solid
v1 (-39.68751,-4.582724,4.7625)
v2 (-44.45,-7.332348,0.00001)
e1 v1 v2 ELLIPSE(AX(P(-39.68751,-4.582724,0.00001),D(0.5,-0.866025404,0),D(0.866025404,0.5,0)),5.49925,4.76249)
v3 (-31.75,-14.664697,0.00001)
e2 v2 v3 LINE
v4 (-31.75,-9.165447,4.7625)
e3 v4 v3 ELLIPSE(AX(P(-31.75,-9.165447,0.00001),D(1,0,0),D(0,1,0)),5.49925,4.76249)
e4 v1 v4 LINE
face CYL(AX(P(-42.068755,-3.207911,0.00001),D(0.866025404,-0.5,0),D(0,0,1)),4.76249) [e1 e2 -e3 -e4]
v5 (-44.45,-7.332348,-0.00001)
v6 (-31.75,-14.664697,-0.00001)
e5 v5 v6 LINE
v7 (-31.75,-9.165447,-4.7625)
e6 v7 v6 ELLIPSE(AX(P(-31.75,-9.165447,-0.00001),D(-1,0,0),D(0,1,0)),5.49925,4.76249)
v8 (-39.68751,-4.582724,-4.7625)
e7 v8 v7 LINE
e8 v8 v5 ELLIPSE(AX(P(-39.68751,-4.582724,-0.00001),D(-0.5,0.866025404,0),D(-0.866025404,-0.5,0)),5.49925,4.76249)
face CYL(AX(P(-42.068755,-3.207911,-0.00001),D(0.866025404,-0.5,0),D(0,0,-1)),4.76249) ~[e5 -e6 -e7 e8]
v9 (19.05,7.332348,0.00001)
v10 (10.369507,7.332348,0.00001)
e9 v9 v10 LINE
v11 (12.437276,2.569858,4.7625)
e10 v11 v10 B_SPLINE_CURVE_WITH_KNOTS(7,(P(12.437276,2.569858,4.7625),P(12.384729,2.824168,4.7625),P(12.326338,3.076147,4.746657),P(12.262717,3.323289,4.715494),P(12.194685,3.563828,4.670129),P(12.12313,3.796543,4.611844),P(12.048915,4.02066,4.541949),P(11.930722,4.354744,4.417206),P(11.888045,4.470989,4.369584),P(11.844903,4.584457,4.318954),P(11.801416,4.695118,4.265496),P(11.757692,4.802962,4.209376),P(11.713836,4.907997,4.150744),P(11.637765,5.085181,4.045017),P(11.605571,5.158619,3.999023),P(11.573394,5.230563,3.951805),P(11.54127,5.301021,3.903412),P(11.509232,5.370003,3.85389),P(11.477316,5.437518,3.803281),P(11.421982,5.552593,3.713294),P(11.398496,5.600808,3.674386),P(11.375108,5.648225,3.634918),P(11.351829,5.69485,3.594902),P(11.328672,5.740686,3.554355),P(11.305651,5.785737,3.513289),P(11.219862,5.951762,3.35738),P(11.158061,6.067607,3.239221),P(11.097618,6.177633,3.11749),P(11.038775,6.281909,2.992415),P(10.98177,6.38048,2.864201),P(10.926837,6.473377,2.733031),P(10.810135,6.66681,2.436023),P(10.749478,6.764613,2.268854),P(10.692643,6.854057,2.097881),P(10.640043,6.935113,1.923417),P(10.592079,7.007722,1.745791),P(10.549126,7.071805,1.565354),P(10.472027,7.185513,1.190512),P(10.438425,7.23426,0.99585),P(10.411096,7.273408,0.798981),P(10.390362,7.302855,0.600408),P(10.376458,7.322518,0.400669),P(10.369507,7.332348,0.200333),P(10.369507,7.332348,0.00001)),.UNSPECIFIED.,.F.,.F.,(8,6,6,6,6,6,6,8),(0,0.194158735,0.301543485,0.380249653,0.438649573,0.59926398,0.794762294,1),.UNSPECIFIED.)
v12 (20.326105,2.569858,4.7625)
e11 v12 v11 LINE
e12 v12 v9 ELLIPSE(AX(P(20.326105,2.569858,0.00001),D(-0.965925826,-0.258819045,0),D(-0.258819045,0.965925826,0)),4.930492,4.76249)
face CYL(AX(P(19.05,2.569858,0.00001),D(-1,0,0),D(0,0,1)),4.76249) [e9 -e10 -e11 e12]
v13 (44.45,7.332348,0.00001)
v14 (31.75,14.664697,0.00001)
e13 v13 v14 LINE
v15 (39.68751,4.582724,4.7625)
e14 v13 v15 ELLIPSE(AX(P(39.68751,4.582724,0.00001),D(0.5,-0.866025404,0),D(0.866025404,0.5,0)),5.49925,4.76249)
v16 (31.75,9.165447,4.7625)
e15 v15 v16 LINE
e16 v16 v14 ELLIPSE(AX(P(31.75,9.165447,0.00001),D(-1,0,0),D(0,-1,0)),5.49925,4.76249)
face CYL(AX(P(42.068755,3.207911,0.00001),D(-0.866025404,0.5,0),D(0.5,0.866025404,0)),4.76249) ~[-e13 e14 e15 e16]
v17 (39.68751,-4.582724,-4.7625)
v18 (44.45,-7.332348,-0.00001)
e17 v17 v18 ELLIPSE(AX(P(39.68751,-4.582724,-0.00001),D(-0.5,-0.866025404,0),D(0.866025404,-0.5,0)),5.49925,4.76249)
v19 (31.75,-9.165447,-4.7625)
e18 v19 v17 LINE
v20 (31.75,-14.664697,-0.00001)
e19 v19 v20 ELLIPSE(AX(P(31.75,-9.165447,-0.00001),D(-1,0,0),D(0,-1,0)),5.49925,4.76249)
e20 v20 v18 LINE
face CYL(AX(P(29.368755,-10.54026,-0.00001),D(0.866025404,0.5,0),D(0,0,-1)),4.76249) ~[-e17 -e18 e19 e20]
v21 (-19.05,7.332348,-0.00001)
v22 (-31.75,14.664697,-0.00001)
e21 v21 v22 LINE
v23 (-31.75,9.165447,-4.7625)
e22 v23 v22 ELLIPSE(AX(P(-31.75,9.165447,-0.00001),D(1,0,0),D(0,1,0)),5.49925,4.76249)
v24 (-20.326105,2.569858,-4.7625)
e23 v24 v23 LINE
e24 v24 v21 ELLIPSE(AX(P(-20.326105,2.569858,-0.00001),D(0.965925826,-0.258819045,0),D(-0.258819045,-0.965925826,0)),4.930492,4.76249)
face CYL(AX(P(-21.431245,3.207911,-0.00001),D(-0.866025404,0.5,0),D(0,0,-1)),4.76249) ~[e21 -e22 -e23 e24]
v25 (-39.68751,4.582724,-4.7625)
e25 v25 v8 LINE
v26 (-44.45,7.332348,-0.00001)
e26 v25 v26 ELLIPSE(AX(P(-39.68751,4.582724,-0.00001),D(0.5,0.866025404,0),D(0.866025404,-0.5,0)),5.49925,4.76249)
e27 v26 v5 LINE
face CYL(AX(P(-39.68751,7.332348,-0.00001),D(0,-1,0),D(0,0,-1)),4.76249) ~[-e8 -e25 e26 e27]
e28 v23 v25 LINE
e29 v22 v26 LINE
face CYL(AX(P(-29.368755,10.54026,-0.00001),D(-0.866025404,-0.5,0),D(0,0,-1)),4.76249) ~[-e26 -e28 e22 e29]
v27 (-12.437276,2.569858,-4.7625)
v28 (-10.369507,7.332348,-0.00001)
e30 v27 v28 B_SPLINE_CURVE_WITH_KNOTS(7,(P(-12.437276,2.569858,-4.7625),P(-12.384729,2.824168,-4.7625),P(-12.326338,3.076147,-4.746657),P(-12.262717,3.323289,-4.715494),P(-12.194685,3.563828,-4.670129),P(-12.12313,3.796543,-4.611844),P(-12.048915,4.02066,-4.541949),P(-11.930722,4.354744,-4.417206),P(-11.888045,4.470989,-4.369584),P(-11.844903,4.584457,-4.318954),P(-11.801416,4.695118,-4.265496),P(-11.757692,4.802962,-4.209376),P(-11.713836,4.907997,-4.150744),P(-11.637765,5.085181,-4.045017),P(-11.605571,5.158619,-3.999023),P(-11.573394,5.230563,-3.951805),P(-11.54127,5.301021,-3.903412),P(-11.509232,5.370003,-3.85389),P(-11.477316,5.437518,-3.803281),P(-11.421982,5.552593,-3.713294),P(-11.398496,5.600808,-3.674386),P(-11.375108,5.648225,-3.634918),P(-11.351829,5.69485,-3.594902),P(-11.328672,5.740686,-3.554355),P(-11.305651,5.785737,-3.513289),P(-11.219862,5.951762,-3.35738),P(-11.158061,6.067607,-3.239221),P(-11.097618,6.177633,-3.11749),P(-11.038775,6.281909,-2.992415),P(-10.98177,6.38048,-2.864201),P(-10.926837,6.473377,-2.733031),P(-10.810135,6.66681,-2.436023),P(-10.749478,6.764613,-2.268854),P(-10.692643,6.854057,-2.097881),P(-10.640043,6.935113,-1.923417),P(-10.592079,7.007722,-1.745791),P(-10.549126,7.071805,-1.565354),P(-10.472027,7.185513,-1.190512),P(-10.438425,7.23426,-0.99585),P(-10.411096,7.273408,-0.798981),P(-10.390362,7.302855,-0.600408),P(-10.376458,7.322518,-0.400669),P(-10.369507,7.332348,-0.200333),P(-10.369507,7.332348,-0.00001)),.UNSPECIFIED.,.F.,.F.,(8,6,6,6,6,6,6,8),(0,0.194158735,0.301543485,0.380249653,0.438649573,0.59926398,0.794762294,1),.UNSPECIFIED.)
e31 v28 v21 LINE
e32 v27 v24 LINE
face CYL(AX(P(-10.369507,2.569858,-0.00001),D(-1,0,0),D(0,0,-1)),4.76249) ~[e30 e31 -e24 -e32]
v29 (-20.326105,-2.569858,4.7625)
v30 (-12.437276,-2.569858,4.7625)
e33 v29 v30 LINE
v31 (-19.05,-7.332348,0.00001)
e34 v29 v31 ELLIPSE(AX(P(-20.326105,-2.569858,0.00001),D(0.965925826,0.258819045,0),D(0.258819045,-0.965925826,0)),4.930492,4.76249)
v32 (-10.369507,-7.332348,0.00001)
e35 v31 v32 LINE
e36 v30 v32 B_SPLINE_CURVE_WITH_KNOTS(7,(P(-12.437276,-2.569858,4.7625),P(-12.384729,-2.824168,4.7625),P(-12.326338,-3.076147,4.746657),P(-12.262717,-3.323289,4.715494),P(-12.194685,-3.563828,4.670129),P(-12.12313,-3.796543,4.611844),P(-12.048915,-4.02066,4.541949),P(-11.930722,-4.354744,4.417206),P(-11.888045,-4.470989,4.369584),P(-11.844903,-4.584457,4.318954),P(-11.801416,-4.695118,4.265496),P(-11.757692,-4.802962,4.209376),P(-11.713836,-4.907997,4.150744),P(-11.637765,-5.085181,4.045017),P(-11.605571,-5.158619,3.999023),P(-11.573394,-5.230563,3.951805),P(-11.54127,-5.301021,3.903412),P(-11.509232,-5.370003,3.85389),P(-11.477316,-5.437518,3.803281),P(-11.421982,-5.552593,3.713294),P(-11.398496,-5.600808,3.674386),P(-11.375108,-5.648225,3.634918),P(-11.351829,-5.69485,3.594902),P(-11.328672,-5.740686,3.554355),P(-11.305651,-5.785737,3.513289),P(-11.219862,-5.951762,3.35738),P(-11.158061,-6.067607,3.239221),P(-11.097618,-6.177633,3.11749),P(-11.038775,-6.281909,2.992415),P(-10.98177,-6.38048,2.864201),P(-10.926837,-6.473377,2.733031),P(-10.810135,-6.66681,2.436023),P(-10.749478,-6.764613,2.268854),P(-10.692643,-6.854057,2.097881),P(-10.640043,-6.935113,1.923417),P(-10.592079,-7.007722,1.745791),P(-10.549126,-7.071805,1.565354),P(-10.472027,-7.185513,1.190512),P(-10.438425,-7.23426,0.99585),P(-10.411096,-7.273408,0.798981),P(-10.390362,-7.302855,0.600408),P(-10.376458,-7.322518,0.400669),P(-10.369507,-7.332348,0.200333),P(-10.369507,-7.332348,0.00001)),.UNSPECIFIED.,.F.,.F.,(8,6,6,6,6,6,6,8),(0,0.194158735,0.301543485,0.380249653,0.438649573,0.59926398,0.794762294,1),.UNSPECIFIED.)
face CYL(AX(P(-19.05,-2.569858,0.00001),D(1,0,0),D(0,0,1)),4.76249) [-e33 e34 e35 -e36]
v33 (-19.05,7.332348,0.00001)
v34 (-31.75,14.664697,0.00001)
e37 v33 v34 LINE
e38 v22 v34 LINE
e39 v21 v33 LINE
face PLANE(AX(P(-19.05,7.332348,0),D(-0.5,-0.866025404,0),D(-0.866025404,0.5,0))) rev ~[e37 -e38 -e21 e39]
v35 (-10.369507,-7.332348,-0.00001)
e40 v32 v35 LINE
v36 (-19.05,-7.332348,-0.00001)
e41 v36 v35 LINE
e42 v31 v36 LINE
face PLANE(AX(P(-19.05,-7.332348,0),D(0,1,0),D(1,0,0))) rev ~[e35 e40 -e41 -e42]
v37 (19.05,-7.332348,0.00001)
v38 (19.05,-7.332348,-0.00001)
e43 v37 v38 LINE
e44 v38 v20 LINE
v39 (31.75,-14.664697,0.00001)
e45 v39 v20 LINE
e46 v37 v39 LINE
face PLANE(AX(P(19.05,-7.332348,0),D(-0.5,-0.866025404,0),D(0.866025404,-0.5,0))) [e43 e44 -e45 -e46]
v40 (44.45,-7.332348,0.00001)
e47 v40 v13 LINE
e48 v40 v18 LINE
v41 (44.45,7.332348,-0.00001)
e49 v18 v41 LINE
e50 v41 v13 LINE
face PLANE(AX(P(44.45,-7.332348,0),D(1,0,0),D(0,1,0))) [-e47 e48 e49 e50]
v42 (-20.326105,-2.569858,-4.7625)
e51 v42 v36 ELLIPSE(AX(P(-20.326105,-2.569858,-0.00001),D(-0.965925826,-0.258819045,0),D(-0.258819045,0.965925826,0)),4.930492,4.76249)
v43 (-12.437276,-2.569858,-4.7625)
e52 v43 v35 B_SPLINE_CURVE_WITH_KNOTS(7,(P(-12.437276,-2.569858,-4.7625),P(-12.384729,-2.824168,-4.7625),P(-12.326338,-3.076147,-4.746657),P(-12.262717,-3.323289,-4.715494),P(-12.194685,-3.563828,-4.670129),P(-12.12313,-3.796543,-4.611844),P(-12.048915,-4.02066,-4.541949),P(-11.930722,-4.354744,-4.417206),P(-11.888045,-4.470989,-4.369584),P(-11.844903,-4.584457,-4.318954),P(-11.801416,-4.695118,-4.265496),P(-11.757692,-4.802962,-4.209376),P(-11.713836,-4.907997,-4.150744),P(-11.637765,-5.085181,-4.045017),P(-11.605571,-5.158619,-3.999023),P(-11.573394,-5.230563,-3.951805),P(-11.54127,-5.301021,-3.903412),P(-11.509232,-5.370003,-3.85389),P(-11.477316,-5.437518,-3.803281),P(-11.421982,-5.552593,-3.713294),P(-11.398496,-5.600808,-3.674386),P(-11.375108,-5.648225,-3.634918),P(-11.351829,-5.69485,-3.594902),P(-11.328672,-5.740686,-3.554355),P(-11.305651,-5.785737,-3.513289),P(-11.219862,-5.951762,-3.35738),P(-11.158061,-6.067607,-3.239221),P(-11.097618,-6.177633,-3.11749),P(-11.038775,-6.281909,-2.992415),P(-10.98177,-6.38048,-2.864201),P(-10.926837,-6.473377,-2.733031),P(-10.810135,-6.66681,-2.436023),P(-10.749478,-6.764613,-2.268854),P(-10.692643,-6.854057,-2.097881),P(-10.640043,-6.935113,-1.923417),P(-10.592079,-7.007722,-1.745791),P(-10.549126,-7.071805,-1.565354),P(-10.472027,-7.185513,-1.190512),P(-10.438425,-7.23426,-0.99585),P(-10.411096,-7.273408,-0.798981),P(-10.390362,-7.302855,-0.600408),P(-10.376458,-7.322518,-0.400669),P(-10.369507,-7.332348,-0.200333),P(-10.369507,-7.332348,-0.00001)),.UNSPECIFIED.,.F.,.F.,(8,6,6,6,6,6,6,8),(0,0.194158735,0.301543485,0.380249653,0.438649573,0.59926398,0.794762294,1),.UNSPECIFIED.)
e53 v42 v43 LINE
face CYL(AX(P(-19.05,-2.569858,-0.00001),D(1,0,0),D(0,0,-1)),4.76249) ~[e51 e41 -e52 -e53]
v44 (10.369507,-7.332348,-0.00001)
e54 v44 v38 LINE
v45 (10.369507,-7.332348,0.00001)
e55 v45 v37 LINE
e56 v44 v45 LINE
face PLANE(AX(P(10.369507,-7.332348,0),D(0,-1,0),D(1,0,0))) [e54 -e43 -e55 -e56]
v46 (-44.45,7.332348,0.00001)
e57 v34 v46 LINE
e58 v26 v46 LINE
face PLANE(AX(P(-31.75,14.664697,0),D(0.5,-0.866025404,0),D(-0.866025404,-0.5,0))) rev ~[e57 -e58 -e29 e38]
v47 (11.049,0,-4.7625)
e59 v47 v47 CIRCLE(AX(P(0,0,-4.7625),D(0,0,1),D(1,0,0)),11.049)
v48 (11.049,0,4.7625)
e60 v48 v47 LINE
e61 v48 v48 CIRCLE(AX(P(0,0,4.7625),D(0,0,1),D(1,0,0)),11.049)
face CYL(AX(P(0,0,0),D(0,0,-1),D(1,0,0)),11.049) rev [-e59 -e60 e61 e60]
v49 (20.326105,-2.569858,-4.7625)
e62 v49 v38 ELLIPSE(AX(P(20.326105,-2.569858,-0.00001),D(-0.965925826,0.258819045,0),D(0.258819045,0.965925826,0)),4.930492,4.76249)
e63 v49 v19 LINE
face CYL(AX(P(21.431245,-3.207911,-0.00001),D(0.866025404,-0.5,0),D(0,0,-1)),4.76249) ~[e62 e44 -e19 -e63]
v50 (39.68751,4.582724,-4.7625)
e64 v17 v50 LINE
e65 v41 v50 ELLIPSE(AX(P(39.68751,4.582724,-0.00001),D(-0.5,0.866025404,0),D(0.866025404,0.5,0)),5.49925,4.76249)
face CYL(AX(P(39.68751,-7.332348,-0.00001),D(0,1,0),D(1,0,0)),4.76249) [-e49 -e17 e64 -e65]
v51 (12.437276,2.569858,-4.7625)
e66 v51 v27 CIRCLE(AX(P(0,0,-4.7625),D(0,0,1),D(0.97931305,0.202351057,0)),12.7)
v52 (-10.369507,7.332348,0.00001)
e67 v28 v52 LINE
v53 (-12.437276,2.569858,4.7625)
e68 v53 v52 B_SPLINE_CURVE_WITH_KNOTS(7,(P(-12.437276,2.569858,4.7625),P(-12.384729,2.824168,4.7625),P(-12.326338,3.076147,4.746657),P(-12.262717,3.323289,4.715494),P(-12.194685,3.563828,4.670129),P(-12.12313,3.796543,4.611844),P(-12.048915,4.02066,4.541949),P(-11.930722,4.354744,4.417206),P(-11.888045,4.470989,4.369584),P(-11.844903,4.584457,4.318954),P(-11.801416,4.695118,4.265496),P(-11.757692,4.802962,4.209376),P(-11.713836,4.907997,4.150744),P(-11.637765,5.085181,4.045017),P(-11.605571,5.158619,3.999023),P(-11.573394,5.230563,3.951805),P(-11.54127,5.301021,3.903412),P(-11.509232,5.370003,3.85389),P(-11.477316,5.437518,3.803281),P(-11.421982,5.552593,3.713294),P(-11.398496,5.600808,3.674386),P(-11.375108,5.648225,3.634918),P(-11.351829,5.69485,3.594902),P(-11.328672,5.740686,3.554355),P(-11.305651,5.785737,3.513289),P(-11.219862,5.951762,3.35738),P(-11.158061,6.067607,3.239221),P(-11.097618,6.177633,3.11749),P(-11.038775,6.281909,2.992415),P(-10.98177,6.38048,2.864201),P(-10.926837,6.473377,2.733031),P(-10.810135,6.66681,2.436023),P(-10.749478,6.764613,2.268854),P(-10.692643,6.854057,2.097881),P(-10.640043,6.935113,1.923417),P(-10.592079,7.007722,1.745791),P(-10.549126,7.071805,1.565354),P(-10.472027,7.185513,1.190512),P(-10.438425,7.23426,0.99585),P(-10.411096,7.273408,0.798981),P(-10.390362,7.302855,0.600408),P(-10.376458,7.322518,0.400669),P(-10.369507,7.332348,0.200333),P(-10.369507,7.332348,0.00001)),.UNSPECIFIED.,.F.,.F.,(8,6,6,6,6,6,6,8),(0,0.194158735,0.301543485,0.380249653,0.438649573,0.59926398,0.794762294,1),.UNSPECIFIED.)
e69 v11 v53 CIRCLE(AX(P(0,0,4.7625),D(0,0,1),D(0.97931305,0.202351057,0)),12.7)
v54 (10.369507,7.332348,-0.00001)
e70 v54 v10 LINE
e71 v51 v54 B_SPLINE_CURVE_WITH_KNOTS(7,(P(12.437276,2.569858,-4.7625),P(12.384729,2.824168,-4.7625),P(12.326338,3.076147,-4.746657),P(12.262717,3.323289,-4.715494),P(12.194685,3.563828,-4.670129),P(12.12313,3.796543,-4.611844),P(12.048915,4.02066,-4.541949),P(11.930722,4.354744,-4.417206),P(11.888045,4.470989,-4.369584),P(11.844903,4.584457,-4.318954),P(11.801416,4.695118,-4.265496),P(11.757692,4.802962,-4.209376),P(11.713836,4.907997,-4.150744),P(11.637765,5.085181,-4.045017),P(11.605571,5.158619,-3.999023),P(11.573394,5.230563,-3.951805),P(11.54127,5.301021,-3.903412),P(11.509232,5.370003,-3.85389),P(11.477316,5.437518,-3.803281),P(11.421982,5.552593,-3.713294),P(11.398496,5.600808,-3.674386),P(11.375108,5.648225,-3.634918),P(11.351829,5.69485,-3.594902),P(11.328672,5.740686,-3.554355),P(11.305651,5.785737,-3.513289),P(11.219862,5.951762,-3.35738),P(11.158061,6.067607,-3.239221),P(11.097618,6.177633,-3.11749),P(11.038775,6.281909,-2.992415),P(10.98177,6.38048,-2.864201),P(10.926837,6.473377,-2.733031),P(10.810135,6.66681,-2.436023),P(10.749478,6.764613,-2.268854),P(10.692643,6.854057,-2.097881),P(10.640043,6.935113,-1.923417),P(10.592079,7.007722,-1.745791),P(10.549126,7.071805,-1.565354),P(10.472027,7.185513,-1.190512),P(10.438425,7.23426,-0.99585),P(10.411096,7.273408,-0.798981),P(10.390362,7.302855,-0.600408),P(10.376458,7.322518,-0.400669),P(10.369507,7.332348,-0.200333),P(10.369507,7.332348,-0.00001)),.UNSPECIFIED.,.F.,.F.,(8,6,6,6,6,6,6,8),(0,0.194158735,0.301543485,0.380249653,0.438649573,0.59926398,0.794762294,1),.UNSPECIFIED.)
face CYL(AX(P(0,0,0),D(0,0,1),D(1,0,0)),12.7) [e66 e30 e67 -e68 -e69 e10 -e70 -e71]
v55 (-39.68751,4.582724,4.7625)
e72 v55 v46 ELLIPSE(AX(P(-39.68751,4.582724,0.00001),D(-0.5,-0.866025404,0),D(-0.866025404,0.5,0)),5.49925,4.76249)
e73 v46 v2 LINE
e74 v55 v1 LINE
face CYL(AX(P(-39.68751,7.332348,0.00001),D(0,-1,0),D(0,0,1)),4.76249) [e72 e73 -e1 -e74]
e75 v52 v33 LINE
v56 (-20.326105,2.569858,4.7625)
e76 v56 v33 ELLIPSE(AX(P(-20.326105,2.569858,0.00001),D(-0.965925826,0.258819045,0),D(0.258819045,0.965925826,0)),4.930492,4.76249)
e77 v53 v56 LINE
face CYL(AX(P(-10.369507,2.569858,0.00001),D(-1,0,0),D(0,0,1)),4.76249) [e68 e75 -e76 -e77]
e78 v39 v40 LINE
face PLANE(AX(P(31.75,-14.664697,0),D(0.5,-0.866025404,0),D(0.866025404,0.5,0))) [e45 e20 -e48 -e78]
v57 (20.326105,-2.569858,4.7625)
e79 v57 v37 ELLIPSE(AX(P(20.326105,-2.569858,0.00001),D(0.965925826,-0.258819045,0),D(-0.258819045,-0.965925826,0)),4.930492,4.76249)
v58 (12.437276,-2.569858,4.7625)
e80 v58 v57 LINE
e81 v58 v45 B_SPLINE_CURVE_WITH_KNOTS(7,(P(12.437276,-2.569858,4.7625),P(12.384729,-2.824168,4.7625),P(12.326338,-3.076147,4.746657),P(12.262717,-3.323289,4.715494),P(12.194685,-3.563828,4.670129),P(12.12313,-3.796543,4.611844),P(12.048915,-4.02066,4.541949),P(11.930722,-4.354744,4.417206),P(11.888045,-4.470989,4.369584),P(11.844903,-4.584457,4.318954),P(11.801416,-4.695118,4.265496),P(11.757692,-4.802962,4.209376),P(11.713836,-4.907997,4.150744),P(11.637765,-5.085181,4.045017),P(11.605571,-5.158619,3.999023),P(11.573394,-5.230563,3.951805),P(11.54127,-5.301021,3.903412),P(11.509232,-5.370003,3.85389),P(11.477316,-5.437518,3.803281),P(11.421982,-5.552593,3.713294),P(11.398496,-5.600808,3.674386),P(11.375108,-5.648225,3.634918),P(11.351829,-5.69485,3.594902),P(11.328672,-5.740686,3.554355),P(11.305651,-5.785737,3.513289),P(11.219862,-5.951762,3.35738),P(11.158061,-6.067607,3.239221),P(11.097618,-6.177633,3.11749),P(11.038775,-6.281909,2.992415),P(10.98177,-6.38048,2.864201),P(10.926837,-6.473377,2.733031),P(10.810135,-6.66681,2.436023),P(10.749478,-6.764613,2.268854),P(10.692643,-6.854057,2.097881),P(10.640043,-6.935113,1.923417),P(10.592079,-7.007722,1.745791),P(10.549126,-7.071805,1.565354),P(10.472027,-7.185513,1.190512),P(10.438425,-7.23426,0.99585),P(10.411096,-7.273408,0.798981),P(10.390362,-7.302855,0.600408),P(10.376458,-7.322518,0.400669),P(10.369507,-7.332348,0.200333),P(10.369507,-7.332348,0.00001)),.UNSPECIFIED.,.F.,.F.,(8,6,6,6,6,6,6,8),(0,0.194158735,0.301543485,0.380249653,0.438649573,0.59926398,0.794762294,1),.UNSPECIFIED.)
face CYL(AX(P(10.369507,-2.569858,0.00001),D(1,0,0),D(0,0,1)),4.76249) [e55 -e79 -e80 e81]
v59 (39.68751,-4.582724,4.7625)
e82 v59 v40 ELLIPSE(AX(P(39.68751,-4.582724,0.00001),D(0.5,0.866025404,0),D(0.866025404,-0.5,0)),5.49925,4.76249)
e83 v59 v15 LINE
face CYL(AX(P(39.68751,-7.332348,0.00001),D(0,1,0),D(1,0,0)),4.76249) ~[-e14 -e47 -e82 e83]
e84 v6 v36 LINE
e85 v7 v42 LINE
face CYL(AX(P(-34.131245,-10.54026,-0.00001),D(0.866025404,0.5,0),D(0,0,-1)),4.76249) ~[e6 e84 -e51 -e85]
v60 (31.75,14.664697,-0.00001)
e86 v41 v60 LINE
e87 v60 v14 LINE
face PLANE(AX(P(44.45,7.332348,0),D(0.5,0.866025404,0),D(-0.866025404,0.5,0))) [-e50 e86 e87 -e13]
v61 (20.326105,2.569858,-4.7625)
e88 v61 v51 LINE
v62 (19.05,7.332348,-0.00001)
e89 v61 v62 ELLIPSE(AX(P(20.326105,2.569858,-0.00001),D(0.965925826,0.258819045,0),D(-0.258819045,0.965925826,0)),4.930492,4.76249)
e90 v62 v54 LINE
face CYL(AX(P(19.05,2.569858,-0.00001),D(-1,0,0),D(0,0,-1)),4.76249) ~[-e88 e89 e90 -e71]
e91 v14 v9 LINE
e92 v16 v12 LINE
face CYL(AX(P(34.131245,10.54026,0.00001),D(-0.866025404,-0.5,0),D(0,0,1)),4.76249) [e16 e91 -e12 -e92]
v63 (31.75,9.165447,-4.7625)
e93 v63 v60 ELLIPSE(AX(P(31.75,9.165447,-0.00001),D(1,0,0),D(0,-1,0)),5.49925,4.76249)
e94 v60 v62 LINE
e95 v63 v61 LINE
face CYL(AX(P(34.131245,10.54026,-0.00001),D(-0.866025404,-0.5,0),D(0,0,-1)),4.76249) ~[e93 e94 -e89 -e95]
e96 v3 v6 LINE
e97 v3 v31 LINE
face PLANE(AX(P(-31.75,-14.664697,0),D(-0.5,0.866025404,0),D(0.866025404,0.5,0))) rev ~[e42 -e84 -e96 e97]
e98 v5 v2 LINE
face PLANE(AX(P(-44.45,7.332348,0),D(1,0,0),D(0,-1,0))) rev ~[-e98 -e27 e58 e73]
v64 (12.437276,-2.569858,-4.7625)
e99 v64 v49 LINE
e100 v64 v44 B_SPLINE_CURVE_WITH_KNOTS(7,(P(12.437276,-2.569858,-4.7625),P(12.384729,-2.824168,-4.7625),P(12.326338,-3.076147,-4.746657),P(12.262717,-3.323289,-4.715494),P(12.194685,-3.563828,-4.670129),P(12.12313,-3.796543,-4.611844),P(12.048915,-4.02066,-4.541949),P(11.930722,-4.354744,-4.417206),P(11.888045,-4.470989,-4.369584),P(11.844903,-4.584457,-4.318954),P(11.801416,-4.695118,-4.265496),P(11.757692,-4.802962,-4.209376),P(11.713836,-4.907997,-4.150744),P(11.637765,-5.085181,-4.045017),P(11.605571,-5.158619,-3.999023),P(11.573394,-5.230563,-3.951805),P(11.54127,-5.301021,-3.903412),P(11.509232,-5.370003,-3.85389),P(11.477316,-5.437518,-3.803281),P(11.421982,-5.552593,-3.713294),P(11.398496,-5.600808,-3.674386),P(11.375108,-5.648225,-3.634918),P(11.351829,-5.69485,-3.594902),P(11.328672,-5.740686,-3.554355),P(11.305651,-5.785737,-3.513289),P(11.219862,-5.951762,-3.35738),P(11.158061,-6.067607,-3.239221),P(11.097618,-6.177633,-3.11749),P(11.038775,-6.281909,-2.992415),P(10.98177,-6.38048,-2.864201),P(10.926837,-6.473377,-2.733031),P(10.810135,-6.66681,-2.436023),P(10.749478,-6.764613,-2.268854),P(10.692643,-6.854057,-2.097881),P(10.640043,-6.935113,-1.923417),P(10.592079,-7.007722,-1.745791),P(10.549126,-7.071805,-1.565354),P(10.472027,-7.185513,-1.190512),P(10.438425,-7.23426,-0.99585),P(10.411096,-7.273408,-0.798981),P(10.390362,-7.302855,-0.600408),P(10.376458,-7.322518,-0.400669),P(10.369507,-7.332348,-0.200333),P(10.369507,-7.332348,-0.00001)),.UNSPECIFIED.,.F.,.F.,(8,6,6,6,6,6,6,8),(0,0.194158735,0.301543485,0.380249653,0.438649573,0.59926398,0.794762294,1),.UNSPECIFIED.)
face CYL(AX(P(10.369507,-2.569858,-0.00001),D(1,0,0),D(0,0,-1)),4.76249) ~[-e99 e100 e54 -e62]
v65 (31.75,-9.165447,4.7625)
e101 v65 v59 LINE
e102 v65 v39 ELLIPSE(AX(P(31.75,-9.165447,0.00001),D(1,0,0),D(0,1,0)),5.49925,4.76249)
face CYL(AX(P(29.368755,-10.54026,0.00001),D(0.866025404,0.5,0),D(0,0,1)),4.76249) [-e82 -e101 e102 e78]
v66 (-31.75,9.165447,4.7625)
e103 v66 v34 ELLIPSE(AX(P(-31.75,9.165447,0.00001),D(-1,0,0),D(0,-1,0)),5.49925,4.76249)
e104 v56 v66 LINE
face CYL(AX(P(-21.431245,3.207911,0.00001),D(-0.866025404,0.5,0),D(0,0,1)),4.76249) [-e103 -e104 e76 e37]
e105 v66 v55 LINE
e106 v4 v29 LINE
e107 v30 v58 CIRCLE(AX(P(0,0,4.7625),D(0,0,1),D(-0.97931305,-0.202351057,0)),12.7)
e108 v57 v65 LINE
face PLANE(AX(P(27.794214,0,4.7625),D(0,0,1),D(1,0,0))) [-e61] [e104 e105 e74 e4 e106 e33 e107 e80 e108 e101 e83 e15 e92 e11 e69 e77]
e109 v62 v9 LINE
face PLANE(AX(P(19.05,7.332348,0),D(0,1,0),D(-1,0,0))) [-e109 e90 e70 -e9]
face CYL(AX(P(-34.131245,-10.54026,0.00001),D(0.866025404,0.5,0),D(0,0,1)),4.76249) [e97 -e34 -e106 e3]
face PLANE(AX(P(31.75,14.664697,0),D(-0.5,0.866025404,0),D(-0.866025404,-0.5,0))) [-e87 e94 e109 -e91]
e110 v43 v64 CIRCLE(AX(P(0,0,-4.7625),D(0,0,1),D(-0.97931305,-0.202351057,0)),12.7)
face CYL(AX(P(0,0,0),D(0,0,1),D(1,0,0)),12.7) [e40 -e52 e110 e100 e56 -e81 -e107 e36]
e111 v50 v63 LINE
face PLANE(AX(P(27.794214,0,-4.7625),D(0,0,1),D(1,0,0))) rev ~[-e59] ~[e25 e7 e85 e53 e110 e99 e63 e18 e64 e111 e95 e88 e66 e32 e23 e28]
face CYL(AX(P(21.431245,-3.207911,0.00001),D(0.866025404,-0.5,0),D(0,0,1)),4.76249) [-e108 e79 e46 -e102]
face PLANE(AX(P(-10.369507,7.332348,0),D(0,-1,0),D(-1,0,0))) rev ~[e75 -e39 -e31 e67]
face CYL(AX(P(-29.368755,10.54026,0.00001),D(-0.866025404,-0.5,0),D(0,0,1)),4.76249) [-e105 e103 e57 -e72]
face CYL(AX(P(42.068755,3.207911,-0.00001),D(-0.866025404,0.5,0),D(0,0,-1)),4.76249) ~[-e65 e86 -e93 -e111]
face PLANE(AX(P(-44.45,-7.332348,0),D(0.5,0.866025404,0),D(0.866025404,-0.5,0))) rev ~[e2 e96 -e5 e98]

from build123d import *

# Parameters (mm, degrees)
F0_R     = 12.7
F0_R_2   = 11.049
F1_DEPTH = 4.7625
F3_DEPTH = 4.7625
F4_R     = 4.76249
F5_R     = 4.76249


# Not quite as in the source:
# - a fillet or chamfer is up to 0.001 mm smaller than in the source, because OpenCascade refuses the exact size


with BuildPart() as f1:
    # F0 (on Top) → F1 (new body, symmetric)
    with BuildSketch(Plane.XY):
        Circle(F0_R)
        Circle(F0_R_2, mode=Mode.SUBTRACT)
    extrude(amount=F1_DEPTH, both=True)

    # F2 (on Top) → F3 (join, symmetric)
    with BuildSketch(Plane.XY):
        with BuildLine():
            ThreePointArc((-10.3695065778, -7.3323484187), (-12.7, 0), (-10.3695065778, 7.3323484187))
            Line((-10.3695065778, 7.3323484187), (-19.05, 7.3323484187))
            Line((-19.05, 7.3323484187), (-31.75, 14.6646968374))
            Line((-31.75, 14.6646968374), (-44.45, 7.3323484187))
            Line((-44.45, 7.3323484187), (-44.45, -7.3323484187))
            Line((-44.45, -7.3323484187), (-31.75, -14.6646968374))
            Line((-31.75, -14.6646968374), (-19.05, -7.3323484187))
            Line((-19.05, -7.3323484187), (-10.3695065778, -7.3323484187))
        make_face()
        with BuildLine():
            Line((44.45, -7.3323484187), (44.45, 7.3323484187))
            Line((44.45, 7.3323484187), (31.75, 14.6646968374))
            Line((31.75, 14.6646968374), (19.05, 7.3323484187))
            Line((19.05, 7.3323484187), (10.3695065778, 7.3323484187))
            ThreePointArc((10.3695065778, 7.3323484187), (12.7, 0), (10.3695065778, -7.3323484187))
            Line((10.3695065778, -7.3323484187), (19.05, -7.3323484187))
            Line((19.05, -7.3323484187), (31.75, -14.6646968374))
            Line((31.75, -14.6646968374), (44.45, -7.3323484187))
        make_face()
    extrude(amount=F3_DEPTH, both=True)

    # F4 (radius 4.7625 in the source; OpenCascade refuses exactly that, so slightly less here)
    f4_edges = [f1.edges().sort_by_distance(p)[0] for p in [
        (38.1, -10.998523, 4.7625),
        (44.45, 0, 4.7625),
        (25.4, -10.998523, 4.7625),
        (14.709753, -7.332348, 4.7625),
        (14.709753, 7.332348, 4.7625),
        (25.4, 10.998523, 4.7625),
        (38.1, 10.998523, 4.7625),
        (14.709753, -7.332348, -4.7625),
        (25.4, -10.998523, -4.7625),
        (38.1, -10.998523, -4.7625),
        (44.45, 0, -4.7625),
        (14.709753, 7.332348, -4.7625),
        (25.4, 10.998523, -4.7625),
        (38.1, 10.998523, -4.7625),
    ]]
    fillet(f4_edges, radius=F4_R)

    # F5 (radius 4.7625 in the source; OpenCascade refuses exactly that, so slightly less here)
    f5_edges = [f1.edges().sort_by_distance(p)[0] for p in [
        (-38.1, 10.998523, 4.7625),
        (-25.4, 10.998523, 4.7625),
        (-14.709753, 7.332348, 4.7625),
        (-14.709753, -7.332348, 4.7625),
        (-25.4, -10.998523, 4.7625),
        (-38.1, -10.998523, 4.7625),
        (-44.45, 0, -4.7625),
        (-44.45, 0, 4.7625),
        (-25.4, -10.998523, -4.7625),
        (-38.1, -10.998523, -4.7625),
        (-14.709753, -7.332348, -4.7625),
        (-14.709753, 7.332348, -4.7625),
        (-25.4, 10.998523, -4.7625),
        (-38.1, 10.998523, -4.7625),
    ]]
    fillet(f5_edges, radius=F5_R)


solid = f1.part
